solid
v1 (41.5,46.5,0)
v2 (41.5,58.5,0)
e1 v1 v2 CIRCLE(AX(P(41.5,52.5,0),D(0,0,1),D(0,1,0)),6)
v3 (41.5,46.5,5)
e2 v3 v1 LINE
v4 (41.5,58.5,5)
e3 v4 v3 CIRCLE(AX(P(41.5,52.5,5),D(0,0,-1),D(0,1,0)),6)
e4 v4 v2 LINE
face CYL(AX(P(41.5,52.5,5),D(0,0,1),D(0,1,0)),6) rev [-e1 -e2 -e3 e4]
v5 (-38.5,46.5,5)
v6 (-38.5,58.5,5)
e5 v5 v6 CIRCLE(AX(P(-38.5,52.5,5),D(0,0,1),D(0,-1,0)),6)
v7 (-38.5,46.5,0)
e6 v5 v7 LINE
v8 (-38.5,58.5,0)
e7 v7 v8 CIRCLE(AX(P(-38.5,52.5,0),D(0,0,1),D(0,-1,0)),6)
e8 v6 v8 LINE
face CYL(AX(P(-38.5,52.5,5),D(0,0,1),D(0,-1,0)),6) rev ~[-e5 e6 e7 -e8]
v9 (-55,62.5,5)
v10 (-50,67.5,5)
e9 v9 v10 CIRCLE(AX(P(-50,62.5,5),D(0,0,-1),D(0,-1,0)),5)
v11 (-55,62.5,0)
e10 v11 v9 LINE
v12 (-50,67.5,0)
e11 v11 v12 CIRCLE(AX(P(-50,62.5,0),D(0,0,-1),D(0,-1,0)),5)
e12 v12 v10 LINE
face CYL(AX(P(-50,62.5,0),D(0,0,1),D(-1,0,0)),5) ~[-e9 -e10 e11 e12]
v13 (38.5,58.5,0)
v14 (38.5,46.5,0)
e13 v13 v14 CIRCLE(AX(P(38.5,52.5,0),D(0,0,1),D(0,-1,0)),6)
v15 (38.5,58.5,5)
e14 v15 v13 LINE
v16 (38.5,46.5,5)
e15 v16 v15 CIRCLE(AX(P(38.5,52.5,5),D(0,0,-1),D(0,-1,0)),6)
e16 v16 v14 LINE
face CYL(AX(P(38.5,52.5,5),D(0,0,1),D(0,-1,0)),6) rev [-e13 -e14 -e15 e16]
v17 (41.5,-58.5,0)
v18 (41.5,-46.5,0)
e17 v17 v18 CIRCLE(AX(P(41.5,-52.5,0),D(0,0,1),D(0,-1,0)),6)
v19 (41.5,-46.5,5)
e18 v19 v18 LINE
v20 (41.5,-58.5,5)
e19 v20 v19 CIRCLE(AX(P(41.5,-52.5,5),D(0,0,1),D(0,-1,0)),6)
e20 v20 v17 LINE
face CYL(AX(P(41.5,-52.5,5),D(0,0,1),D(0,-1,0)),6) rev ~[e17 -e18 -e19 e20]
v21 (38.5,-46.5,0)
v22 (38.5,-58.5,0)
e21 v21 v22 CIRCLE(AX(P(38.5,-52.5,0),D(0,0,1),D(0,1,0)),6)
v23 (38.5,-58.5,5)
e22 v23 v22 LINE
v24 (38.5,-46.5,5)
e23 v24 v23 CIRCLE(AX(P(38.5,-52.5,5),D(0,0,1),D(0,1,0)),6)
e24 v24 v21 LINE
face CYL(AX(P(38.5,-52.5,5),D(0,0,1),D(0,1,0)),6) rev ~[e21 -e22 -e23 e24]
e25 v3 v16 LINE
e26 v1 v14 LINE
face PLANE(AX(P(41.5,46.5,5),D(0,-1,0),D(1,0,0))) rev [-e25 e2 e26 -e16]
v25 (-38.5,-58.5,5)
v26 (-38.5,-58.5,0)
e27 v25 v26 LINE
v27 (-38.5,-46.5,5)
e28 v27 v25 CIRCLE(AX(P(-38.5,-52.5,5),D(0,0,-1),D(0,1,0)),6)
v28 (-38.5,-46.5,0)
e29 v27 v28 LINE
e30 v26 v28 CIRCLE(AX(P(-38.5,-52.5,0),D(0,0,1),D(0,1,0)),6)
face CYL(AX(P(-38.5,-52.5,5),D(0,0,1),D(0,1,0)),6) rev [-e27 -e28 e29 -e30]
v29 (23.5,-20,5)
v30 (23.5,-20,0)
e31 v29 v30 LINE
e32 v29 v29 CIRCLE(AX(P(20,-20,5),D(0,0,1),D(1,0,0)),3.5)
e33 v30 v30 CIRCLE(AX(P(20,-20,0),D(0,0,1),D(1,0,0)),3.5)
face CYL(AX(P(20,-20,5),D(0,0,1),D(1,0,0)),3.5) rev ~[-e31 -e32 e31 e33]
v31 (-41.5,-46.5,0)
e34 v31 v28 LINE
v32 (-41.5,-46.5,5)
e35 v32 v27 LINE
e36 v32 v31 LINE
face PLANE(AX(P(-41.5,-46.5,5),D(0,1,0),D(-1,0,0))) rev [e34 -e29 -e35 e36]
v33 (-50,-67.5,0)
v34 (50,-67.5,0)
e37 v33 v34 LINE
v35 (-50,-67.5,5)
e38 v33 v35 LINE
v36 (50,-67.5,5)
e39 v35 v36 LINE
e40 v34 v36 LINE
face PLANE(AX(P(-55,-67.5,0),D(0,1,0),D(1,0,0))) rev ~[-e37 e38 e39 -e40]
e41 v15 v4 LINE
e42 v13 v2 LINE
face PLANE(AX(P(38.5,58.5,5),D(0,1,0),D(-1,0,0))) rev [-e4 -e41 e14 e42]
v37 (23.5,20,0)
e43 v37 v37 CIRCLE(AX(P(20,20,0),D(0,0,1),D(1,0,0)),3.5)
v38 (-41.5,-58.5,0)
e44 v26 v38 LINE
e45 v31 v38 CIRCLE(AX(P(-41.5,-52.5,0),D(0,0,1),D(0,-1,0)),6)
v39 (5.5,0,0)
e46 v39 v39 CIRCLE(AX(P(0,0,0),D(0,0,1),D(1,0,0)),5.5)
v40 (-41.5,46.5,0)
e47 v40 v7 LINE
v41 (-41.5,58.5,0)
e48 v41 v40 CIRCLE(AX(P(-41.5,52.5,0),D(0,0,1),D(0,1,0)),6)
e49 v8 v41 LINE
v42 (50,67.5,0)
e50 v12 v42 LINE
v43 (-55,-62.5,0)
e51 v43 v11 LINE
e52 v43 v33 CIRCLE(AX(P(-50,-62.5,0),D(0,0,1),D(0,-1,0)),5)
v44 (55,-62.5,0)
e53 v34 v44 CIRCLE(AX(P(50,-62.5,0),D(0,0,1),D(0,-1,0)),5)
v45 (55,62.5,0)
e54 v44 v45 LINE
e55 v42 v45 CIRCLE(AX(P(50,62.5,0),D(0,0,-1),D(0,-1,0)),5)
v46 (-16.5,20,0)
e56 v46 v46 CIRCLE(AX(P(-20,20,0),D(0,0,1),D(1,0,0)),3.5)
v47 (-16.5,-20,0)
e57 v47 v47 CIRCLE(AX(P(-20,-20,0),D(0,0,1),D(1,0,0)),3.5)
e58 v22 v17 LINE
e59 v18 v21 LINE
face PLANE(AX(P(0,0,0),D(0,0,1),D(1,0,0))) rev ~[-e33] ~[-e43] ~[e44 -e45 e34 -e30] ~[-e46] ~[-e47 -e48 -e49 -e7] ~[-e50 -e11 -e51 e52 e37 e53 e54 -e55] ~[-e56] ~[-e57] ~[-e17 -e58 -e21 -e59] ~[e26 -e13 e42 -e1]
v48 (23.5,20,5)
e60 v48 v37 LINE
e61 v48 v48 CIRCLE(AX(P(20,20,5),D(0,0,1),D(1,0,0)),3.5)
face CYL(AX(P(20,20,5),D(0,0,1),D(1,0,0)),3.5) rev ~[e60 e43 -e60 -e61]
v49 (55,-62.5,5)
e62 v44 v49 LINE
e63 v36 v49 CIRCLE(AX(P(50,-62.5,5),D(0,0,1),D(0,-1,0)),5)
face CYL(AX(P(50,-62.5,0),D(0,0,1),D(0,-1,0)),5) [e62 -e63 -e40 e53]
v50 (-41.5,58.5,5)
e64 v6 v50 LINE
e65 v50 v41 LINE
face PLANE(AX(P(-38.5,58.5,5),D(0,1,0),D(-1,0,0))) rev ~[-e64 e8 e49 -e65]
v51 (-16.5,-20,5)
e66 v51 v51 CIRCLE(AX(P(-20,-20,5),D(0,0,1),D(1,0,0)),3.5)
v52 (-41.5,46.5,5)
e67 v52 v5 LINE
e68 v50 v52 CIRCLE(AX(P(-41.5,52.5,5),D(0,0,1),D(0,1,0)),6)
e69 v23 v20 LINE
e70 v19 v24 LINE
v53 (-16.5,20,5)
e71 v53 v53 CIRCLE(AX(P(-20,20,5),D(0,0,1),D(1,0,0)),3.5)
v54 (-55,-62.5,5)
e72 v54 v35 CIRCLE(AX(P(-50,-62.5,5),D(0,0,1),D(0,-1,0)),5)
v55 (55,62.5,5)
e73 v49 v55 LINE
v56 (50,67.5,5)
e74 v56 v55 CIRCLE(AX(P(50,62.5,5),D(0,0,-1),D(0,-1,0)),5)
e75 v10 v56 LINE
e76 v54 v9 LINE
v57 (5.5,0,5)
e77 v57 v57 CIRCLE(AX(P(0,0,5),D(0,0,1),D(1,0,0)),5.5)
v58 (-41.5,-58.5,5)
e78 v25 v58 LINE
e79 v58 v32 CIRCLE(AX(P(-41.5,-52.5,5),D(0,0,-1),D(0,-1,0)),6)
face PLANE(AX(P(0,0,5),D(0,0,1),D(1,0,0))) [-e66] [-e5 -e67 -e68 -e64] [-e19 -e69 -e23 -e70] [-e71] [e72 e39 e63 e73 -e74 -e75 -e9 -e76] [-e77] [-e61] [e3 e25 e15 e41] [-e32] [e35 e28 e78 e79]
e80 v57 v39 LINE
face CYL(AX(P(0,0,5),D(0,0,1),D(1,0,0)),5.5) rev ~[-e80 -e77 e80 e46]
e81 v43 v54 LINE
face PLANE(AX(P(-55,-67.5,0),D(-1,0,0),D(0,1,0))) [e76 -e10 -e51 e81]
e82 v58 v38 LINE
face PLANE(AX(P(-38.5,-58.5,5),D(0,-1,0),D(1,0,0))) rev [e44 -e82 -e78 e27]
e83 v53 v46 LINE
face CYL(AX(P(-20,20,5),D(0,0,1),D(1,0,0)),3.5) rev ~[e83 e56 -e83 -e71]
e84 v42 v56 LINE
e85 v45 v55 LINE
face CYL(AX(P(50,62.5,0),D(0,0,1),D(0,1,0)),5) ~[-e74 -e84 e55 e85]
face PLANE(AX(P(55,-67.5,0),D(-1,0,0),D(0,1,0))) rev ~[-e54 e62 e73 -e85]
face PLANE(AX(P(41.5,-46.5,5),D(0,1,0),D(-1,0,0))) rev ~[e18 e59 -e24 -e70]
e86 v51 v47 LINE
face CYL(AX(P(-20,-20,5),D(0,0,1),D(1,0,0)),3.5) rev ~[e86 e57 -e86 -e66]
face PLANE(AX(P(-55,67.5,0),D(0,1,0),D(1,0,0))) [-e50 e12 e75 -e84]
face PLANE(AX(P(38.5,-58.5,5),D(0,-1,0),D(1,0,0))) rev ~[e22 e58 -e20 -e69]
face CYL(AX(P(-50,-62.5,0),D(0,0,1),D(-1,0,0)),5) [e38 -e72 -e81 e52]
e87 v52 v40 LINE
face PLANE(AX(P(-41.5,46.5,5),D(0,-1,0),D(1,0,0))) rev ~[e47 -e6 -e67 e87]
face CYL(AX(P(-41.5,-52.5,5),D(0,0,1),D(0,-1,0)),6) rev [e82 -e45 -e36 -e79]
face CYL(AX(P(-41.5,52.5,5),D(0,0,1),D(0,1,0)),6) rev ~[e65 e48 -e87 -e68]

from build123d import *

# Parameters (mm, degrees)
F0_W             = 110
F0_H             = 135
F1_DEPTH         = 5
F2_R             = 3.5
F2_R_2           = 5.5
F3_DEPTH         = 25
F5_DEPTH         = 25
F5_COPIES2_COUNT = 2
F5_COPIES2_PITCH = 132.003788
F6_R             = 5


# Not quite as in the source:
# - a pattern or mirror of a feature is missing from the dataset's text; its kind, count and spacing are read off the source's solid


with BuildPart() as f1:
    # F0 (on Top) → F1 (new body)
    with BuildSketch(Plane.XY):
        Rectangle(F0_W, F0_H)
    extrude(amount=F1_DEPTH)

    # F2 (on face) → F3 (cut)
    with BuildSketch(Plane.XY.offset(5)):
        with Locations((-20, 20)):
            Circle(F2_R)
        with Locations((20, 20)):
            Circle(F2_R)
        with Locations((20, -20)):
            Circle(F2_R)
        with Locations((-20, -20)):
            Circle(F2_R)
        Circle(F2_R_2)
    extrude(amount=-F3_DEPTH, mode=Mode.SUBTRACT)

    # F4 (on face) → F5 (cut)
    with BuildSketch(Plane.XY.offset(5)):
        with BuildLine():
            ThreePointArc((-41.5, 58.5), (-47.5, 52.5), (-41.5, 46.5))
            Line((-41.5, 46.5), (-38.5, 46.5))
            ThreePointArc((-38.5, 46.5), (-32.5, 52.5), (-38.5, 58.5))
            Line((-38.5, 58.5), (-41.5, 58.5))
        make_face()
    f5 = extrude(amount=-F5_DEPTH, mode=Mode.SUBTRACT)

    # F5_copies: F5 across plane
    add(f5.mirror(Plane(origin=(0, 0, 0), x_dir=(0, 0, -1), z_dir=(0, -1, 0))), mode=Mode.SUBTRACT)

    # F5_copies1: F5 across plane
    add(f5.mirror(Plane(origin=(0, 0, 0), x_dir=(0, 0, 1), z_dir=(1, 0, 0))), mode=Mode.SUBTRACT)

    # F5_copies2: F5 ×2
    with Locations(*[Vector(0.6060432153, -0.79543172, 0) * (i * F5_COPIES2_PITCH) for i in range(1, F5_COPIES2_COUNT)]):
        add(f5, mode=Mode.SUBTRACT)

    # F6
    f6_edges = [f1.edges().sort_by_distance(p)[0] for p in [
        (-55, 67.5, 2.5),
        (55, 67.5, 2.5),
        (55, -67.5, 2.5),
        (-55, -67.5, 2.5),
    ]]
    fillet(f6_edges, radius=F6_R)


solid = f1.part
